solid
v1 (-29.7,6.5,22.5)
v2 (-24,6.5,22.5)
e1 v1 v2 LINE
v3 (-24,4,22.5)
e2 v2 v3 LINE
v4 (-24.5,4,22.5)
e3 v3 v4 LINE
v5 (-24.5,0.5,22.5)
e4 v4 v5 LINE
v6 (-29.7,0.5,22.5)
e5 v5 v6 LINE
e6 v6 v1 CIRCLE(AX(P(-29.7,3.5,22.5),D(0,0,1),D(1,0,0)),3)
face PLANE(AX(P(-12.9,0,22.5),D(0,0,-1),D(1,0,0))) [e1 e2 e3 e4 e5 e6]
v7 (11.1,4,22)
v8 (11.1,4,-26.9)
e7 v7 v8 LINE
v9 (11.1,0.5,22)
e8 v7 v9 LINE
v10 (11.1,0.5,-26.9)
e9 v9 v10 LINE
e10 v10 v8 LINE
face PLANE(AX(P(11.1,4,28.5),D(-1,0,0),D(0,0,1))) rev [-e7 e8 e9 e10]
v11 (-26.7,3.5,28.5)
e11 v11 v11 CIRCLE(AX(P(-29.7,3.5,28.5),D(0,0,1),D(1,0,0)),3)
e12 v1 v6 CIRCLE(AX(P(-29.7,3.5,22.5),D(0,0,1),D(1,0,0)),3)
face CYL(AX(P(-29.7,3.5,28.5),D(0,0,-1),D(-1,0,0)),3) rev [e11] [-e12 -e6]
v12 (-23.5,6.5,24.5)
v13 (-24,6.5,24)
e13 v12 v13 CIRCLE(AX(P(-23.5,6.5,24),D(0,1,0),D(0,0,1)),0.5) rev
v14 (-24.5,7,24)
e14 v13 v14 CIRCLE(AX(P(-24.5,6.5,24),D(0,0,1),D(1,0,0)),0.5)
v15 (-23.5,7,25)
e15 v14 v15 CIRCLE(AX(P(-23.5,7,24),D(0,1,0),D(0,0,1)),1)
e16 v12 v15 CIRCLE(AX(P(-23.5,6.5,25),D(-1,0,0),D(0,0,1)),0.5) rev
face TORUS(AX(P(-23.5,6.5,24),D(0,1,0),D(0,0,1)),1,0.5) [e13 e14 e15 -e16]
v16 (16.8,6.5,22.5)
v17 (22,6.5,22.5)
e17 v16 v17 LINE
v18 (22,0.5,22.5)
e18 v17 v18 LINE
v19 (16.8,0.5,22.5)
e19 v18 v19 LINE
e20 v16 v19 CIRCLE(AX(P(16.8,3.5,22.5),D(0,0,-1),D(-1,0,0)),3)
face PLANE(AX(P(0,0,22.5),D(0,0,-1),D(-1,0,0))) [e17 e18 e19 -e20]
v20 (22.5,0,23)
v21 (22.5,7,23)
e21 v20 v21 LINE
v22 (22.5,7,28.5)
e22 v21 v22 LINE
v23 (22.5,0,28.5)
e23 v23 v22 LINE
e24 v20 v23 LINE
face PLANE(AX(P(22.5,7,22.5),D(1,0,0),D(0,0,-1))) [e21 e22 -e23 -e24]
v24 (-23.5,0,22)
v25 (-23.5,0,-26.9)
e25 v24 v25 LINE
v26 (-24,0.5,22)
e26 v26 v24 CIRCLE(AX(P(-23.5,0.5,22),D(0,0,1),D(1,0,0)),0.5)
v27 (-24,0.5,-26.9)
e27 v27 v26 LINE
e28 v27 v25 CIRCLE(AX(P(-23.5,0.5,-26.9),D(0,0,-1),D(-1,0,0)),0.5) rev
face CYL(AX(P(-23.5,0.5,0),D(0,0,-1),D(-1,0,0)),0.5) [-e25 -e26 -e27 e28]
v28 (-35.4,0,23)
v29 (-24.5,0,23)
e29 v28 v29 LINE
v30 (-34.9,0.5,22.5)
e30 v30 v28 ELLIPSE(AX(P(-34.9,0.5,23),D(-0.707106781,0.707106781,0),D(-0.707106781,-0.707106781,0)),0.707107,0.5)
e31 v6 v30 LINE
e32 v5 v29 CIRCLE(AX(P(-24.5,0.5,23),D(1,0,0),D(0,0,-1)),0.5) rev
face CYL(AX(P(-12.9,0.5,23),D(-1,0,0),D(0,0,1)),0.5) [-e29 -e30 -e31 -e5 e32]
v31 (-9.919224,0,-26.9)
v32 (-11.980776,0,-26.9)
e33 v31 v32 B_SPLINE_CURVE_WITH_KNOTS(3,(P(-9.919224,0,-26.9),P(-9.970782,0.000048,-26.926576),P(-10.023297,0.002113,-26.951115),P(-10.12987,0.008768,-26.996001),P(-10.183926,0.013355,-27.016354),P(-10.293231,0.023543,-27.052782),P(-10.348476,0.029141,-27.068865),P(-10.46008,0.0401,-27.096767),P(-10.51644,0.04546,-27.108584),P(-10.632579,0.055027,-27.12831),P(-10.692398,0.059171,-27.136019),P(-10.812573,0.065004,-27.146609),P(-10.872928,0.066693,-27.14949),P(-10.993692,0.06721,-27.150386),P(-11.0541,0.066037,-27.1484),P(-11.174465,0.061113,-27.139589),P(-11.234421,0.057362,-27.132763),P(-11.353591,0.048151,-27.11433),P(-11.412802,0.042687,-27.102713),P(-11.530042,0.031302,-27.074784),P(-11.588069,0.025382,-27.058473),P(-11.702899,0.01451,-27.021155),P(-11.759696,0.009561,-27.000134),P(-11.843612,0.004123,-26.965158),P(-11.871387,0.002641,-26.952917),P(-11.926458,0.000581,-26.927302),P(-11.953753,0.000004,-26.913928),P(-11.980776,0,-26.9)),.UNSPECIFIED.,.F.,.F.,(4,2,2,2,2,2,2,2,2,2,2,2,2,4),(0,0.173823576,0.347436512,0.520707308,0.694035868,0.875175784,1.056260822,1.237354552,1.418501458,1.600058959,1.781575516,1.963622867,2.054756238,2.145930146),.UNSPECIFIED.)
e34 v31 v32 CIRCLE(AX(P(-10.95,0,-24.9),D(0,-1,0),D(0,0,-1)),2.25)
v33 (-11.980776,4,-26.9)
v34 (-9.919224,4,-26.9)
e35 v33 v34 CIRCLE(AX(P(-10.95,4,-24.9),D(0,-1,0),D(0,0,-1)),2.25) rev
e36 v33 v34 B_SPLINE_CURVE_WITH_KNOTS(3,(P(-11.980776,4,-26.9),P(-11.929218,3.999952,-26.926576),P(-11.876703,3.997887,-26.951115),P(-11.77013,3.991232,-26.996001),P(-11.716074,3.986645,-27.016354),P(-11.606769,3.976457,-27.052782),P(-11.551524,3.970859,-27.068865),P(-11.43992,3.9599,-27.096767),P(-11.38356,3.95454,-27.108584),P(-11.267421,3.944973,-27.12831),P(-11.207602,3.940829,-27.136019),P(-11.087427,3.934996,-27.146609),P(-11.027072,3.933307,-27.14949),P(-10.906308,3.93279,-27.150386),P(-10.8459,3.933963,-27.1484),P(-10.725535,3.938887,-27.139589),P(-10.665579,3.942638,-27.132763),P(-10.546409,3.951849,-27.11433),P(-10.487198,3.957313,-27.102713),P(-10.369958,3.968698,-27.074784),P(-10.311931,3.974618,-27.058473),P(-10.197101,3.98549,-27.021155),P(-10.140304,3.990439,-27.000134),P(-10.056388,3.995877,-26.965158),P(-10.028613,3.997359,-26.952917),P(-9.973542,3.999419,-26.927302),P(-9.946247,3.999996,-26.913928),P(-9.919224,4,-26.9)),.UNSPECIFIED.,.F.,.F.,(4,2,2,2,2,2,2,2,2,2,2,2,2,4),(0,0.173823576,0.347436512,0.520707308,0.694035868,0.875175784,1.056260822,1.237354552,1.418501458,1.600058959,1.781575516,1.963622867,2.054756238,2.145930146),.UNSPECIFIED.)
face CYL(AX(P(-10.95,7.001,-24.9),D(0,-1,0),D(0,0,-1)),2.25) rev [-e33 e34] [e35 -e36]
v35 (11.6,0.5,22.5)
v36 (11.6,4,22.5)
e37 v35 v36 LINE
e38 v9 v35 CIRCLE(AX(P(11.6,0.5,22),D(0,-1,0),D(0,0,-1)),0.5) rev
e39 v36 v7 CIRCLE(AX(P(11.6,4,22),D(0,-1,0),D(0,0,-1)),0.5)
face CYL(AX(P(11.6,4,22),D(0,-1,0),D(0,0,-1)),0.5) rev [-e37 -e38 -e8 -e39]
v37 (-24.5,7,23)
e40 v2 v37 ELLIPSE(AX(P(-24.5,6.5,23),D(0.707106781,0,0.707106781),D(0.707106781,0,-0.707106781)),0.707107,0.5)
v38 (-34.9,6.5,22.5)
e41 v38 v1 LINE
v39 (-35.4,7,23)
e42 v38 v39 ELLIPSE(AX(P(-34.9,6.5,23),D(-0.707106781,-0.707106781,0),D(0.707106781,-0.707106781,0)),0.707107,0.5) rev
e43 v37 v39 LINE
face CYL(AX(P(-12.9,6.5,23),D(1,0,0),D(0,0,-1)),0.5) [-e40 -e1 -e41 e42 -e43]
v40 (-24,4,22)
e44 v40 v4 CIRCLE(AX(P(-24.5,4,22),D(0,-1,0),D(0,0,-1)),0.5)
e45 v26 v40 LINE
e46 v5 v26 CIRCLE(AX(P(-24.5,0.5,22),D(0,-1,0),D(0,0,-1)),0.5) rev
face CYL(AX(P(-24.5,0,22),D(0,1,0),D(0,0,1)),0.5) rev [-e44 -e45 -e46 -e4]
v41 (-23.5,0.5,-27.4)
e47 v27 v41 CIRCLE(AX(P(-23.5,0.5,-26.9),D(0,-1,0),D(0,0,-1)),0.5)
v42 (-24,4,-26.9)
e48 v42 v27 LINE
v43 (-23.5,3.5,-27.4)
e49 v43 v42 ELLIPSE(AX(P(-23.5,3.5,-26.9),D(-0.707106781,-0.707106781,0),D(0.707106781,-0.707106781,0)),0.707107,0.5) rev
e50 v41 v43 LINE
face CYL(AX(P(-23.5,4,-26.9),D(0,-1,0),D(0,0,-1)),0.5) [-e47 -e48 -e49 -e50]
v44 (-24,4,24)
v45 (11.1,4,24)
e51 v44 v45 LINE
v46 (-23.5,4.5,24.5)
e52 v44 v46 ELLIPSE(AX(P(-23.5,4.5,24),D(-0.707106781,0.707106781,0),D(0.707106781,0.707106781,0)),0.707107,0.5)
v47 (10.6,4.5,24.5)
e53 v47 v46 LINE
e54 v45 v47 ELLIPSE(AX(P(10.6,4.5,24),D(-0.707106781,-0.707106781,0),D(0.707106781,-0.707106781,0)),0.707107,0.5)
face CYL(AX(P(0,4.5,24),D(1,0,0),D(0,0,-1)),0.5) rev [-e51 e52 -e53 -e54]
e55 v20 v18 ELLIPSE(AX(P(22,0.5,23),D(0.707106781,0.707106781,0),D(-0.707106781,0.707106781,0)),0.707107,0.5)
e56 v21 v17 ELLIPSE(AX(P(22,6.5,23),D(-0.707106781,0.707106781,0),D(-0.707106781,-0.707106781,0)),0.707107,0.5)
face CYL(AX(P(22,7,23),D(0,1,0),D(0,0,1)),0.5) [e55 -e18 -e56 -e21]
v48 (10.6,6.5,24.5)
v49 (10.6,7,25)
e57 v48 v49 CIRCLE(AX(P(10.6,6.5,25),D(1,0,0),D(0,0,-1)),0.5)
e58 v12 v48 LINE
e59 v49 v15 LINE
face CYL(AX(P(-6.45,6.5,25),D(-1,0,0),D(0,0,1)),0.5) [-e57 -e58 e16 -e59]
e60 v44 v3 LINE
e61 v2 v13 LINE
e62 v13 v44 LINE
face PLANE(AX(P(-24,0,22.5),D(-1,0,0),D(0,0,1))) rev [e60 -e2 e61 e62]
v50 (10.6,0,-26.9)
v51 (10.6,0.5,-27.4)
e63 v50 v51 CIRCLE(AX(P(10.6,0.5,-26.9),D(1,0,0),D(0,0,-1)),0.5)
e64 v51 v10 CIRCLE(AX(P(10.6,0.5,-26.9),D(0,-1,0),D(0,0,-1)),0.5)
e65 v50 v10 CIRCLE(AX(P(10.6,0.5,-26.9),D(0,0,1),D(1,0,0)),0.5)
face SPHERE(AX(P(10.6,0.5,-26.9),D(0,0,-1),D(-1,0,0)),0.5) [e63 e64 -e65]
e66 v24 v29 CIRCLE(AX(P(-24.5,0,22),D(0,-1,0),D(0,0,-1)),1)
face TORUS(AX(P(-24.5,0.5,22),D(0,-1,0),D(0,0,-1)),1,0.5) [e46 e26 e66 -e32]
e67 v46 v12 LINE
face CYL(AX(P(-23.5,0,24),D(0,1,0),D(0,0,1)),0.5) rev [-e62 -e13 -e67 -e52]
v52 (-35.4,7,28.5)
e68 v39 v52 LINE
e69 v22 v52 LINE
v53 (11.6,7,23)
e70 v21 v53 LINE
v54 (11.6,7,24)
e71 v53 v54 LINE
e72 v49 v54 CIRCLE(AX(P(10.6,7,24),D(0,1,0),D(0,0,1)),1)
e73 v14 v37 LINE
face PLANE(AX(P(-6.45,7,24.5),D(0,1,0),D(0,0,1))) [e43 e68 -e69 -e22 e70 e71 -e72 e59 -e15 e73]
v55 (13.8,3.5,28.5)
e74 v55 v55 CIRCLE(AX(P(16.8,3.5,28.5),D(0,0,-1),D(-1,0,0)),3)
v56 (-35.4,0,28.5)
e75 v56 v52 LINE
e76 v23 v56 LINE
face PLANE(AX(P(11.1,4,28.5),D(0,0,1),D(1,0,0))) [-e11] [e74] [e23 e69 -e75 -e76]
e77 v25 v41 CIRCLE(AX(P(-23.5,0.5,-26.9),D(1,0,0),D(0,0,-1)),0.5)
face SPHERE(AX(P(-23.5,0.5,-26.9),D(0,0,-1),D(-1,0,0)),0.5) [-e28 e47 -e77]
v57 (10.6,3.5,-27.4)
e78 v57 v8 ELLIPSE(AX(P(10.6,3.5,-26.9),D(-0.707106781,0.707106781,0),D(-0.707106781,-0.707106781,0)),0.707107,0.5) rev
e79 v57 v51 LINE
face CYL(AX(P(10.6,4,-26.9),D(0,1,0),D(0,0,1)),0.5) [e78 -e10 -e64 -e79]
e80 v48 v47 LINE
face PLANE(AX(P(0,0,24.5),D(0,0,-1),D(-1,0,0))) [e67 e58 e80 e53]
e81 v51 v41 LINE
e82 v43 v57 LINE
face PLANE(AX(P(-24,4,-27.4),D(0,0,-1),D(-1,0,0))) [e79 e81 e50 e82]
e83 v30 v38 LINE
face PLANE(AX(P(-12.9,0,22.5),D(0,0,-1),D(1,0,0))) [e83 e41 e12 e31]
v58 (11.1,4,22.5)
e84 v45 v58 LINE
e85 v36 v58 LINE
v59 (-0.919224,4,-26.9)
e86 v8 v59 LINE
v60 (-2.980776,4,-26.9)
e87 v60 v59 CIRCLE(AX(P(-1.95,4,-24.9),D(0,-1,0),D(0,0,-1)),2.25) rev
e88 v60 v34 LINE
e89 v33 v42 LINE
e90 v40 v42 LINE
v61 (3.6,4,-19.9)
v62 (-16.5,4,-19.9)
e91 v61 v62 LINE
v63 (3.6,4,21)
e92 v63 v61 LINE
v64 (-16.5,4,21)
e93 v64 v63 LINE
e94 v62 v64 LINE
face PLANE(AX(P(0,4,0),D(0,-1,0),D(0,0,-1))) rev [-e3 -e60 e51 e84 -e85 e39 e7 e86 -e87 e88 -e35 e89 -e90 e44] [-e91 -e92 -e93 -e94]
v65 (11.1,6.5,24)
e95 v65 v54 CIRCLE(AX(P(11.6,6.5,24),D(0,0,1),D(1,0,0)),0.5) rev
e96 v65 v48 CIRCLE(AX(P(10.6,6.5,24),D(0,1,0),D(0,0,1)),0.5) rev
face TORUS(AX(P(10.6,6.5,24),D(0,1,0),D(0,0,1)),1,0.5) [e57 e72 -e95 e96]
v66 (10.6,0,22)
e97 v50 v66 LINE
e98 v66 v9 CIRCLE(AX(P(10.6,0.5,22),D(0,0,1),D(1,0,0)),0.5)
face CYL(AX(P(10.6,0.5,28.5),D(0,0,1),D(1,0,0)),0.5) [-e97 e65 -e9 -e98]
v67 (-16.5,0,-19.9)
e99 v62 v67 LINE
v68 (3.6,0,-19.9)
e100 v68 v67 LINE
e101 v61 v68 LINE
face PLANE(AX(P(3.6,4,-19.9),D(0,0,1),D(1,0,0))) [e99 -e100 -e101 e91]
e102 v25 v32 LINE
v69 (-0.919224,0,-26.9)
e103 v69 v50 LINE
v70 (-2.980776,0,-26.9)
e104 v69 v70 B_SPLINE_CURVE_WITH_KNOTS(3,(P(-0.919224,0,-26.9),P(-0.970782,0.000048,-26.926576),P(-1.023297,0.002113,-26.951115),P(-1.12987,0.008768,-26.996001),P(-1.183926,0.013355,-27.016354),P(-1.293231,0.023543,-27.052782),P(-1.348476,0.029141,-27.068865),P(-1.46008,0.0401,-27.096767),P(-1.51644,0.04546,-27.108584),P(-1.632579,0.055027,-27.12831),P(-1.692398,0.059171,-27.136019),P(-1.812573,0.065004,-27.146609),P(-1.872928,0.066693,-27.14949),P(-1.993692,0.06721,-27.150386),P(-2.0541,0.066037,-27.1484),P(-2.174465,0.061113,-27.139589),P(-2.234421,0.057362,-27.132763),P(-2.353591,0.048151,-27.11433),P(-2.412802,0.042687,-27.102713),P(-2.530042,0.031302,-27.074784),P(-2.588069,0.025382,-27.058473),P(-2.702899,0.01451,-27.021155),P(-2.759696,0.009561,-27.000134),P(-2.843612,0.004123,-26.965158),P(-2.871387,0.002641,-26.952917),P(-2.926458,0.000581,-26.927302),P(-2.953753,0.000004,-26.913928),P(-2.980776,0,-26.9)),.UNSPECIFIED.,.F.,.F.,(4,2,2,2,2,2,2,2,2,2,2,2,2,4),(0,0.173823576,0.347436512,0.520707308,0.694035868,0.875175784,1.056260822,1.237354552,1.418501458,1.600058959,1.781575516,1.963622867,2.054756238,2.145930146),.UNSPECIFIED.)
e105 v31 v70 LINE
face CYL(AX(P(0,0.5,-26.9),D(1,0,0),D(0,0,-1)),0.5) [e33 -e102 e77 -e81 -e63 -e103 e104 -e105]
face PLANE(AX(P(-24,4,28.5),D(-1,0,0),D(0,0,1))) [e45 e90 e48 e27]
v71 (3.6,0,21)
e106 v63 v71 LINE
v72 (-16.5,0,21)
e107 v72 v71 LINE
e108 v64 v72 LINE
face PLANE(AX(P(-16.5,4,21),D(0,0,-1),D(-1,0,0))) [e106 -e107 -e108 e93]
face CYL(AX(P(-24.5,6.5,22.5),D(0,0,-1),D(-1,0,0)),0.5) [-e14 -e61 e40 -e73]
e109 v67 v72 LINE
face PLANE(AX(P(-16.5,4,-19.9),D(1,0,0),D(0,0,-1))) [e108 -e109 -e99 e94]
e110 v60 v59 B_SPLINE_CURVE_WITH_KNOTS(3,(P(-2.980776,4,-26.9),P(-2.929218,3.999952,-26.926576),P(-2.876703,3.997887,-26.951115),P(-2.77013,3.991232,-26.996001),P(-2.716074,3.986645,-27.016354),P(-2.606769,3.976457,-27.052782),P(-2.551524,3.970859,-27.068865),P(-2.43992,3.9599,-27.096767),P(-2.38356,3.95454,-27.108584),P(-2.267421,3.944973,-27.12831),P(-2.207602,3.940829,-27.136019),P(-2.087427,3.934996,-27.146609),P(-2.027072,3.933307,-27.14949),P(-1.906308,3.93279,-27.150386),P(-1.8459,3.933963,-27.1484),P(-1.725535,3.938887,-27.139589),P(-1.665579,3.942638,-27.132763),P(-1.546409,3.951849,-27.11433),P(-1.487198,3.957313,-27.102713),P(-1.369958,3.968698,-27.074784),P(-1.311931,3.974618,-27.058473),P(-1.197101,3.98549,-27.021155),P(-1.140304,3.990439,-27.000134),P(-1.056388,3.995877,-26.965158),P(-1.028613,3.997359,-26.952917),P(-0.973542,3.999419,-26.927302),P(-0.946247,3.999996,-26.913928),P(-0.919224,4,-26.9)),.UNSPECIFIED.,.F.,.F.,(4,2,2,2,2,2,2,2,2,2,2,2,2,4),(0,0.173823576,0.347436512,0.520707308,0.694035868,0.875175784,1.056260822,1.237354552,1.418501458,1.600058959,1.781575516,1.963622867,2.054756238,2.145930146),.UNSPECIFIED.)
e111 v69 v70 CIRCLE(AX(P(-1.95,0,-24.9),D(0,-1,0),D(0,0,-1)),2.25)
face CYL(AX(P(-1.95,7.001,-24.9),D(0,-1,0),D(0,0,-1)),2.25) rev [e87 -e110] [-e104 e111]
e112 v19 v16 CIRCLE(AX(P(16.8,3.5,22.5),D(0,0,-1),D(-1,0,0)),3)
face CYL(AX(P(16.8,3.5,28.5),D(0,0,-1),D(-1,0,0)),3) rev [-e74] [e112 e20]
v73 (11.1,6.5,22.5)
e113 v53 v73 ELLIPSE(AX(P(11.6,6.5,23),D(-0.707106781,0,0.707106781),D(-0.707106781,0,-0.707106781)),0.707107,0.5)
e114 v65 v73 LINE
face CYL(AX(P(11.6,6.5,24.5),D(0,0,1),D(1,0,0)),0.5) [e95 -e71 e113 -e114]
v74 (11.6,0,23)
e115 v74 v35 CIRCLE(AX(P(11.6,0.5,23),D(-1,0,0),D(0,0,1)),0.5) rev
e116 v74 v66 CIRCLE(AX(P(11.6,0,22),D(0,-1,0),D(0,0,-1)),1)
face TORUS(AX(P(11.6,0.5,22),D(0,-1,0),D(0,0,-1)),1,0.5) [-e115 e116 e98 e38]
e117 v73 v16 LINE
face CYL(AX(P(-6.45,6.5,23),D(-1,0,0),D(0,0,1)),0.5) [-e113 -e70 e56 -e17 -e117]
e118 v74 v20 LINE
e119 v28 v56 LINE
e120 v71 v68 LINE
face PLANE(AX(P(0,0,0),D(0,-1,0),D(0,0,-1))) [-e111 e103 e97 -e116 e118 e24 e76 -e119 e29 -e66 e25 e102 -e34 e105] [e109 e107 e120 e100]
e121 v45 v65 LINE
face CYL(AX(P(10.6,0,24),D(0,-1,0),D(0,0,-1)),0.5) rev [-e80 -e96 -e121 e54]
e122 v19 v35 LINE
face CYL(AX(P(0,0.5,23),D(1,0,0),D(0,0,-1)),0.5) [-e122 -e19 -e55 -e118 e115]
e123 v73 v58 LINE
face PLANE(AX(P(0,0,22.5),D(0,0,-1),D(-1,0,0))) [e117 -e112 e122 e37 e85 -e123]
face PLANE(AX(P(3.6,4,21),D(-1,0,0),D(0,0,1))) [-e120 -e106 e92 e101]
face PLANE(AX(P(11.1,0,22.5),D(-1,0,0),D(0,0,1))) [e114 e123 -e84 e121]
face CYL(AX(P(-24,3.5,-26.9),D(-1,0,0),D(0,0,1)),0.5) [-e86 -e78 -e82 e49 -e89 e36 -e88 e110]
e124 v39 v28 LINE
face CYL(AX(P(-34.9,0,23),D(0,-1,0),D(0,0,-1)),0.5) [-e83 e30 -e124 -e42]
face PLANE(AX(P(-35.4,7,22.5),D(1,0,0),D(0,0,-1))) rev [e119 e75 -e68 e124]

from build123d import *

# Parameters (mm, degrees)
ESQUISSE1_W             = 35.1
ESQUISSE1_H             = 55.9
ESQUISSE1_W_2           = 20.1
ESQUISSE1_H_2           = 40.9
BOSS_EXTRU_1_DEPTH      = 4
ESQUISSE5_W             = 17.55
ESQUISSE5_H             = 3
BOSS_EXTRU_2_DEPTH      = 4
ESQUISSE7_W             = 11.4
ESQUISSE7_H             = 7
BOSS_EXTRU_3_DEPTH      = 6
ESQUISSE8_R             = 3
ENL_V_MAT_EXTRU_1_DEPTH = 6
CONG_1_R                = 0.5
CONG_2_R                = 0.5
ENL_V_MAT_EXTRU_2_REACH = 47.983
ESQUISSE9_R             = 2.25


with BuildPart() as part:
    # Esquisse1 → Boss.-Extru.1 (new body)
    with BuildSketch(Plane(origin=(0, 0, 0), x_dir=(1, 0, 0), z_dir=(0, 1, 0))):
        with Locations((-6.45, -0.55)):
            Rectangle(ESQUISSE1_W, ESQUISSE1_H)
        with Locations((-6.45, -0.55)):
            Rectangle(ESQUISSE1_W_2, ESQUISSE1_H_2, mode=Mode.SUBTRACT)
    extrude(amount=BOSS_EXTRU_1_DEPTH)

    # Esquisse5 → Boss.-Extru.2 (add)
    with BuildSketch(Plane.XY.offset(28.5)):
        with Locations((2.325, 5.5)):
            Rectangle(ESQUISSE5_W, ESQUISSE5_H)
    boss_extru_2 = extrude(amount=-BOSS_EXTRU_2_DEPTH)

    # Symétrie1: Boss.-Extru.2 across plane
    add(boss_extru_2.mirror(Plane(origin=(-6.45, 0, 0), x_dir=(0, 0, 1), z_dir=(1, 0, 0))))

    # Esquisse7 → Boss.-Extru.3 (add)
    with BuildSketch(Plane.XY.offset(28.5)):
        with Locations((16.8, 3.5)):
            Rectangle(ESQUISSE7_W, ESQUISSE7_H)
    boss_extru_3 = extrude(amount=-BOSS_EXTRU_3_DEPTH)

    # Esquisse8 → Enlèv. mat.-Extru.1 (cut)
    with BuildSketch(Plane(origin=(0, 0, 22.5), x_dir=(-1, 0, 0), z_dir=(0, 0, -1))):
        with Locations((-16.8, 3.5)):
            Circle(ESQUISSE8_R)
    enl_v_mat_extru_1 = extrude(amount=-ENL_V_MAT_EXTRU_1_DEPTH, mode=Mode.SUBTRACT)

    # Symétrie2: Boss.-Extru.3 across plane
    add(boss_extru_3.mirror(Plane(origin=(-6.45, 0, 0), x_dir=(0, 0, 1), z_dir=(1, 0, 0))))

    # Symétrie3: Enlèv. mat.-Extru.1 across plane
    add(enl_v_mat_extru_1.mirror(Plane(origin=(-6.45, 0, 0), x_dir=(0, 0, 1), z_dir=(1, 0, 0))), mode=Mode.SUBTRACT)

    # Congé1
    cong_1_edges = [part.edges().sort_by_distance(p)[0] for p in [
        (11.1, 7, 23.5),
        (-24, 7, 23.5),
        (-24, 0, -2.45),
        (11.1, 0, -2.45),
        (11.1, 5.5, 24.5),
        (-6.45, 7, 24.5),
        (-24, 5.5, 24.5),
        (-6.45, 4, 24.5),
        (-29.7, 7, 22.5),
        (-35.4, 3.5, 22.5),
        (-29.7, 0, 22.5),
        (-24, 2, 22.5),
        (11.1, 2, 22.5),
        (16.8, 0, 22.5),
        (22.5, 3.5, 22.5),
        (16.8, 7, 22.5),
    ]]
    fillet(cong_1_edges, radius=CONG_1_R - 0.0001)  # a hair under: the kernel refuses the full size

    # Congé2
    cong_2_edges = [part.edges().sort_by_distance(p)[0] for p in [
        (-6.45, 0, -27.4),
        (10.95358268, 0.14641732, -27.4),
        (-23.85358268, 0.14641732, -27.4),
        (-6.45, 4, -27.4),
        (11.1, 2.24995, -27.4),
        (-24, 2.24995, -27.4),
    ]]
    fillet(cong_2_edges, radius=CONG_2_R - 0.0001)  # a hair under: the kernel refuses the full size

    # Esquisse9 → Enlèv. mat.-Extru.2 (cut, up to next)
    with BuildSketch(Plane.XZ, mode=Mode.PRIVATE) as enl_v_mat_extru_2_sk1:
        with Locations(Location((-1.95, -24.9, 0), (0, 0, 297.266044451))):
            Circle(ESQUISSE9_R)
    enl_v_mat_extru_2_tool1 = extrude(enl_v_mat_extru_2_sk1.sketch, amount=-ENL_V_MAT_EXTRU_2_REACH, mode=Mode.PRIVATE) & part.part
    # Esquisse9 → Enlèv. mat.-Extru.2 (cut, up to next)
    with BuildSketch(Plane.XZ, mode=Mode.PRIVATE) as enl_v_mat_extru_2_sk2:
        with Locations(Location((-10.95, -24.9, 0), (0, 0, 242.733955549))):
            Circle(ESQUISSE9_R)
    enl_v_mat_extru_2_tool2 = extrude(enl_v_mat_extru_2_sk2.sketch, amount=-ENL_V_MAT_EXTRU_2_REACH, mode=Mode.PRIVATE) & part.part
    add(enl_v_mat_extru_2_tool1.solids().sort_by_distance((-1.95, 0, -24.9))[0], mode=Mode.SUBTRACT)
    add(enl_v_mat_extru_2_tool2.solids().sort_by_distance((-10.95, 0, -24.9))[0], mode=Mode.SUBTRACT)


solid = part.part
